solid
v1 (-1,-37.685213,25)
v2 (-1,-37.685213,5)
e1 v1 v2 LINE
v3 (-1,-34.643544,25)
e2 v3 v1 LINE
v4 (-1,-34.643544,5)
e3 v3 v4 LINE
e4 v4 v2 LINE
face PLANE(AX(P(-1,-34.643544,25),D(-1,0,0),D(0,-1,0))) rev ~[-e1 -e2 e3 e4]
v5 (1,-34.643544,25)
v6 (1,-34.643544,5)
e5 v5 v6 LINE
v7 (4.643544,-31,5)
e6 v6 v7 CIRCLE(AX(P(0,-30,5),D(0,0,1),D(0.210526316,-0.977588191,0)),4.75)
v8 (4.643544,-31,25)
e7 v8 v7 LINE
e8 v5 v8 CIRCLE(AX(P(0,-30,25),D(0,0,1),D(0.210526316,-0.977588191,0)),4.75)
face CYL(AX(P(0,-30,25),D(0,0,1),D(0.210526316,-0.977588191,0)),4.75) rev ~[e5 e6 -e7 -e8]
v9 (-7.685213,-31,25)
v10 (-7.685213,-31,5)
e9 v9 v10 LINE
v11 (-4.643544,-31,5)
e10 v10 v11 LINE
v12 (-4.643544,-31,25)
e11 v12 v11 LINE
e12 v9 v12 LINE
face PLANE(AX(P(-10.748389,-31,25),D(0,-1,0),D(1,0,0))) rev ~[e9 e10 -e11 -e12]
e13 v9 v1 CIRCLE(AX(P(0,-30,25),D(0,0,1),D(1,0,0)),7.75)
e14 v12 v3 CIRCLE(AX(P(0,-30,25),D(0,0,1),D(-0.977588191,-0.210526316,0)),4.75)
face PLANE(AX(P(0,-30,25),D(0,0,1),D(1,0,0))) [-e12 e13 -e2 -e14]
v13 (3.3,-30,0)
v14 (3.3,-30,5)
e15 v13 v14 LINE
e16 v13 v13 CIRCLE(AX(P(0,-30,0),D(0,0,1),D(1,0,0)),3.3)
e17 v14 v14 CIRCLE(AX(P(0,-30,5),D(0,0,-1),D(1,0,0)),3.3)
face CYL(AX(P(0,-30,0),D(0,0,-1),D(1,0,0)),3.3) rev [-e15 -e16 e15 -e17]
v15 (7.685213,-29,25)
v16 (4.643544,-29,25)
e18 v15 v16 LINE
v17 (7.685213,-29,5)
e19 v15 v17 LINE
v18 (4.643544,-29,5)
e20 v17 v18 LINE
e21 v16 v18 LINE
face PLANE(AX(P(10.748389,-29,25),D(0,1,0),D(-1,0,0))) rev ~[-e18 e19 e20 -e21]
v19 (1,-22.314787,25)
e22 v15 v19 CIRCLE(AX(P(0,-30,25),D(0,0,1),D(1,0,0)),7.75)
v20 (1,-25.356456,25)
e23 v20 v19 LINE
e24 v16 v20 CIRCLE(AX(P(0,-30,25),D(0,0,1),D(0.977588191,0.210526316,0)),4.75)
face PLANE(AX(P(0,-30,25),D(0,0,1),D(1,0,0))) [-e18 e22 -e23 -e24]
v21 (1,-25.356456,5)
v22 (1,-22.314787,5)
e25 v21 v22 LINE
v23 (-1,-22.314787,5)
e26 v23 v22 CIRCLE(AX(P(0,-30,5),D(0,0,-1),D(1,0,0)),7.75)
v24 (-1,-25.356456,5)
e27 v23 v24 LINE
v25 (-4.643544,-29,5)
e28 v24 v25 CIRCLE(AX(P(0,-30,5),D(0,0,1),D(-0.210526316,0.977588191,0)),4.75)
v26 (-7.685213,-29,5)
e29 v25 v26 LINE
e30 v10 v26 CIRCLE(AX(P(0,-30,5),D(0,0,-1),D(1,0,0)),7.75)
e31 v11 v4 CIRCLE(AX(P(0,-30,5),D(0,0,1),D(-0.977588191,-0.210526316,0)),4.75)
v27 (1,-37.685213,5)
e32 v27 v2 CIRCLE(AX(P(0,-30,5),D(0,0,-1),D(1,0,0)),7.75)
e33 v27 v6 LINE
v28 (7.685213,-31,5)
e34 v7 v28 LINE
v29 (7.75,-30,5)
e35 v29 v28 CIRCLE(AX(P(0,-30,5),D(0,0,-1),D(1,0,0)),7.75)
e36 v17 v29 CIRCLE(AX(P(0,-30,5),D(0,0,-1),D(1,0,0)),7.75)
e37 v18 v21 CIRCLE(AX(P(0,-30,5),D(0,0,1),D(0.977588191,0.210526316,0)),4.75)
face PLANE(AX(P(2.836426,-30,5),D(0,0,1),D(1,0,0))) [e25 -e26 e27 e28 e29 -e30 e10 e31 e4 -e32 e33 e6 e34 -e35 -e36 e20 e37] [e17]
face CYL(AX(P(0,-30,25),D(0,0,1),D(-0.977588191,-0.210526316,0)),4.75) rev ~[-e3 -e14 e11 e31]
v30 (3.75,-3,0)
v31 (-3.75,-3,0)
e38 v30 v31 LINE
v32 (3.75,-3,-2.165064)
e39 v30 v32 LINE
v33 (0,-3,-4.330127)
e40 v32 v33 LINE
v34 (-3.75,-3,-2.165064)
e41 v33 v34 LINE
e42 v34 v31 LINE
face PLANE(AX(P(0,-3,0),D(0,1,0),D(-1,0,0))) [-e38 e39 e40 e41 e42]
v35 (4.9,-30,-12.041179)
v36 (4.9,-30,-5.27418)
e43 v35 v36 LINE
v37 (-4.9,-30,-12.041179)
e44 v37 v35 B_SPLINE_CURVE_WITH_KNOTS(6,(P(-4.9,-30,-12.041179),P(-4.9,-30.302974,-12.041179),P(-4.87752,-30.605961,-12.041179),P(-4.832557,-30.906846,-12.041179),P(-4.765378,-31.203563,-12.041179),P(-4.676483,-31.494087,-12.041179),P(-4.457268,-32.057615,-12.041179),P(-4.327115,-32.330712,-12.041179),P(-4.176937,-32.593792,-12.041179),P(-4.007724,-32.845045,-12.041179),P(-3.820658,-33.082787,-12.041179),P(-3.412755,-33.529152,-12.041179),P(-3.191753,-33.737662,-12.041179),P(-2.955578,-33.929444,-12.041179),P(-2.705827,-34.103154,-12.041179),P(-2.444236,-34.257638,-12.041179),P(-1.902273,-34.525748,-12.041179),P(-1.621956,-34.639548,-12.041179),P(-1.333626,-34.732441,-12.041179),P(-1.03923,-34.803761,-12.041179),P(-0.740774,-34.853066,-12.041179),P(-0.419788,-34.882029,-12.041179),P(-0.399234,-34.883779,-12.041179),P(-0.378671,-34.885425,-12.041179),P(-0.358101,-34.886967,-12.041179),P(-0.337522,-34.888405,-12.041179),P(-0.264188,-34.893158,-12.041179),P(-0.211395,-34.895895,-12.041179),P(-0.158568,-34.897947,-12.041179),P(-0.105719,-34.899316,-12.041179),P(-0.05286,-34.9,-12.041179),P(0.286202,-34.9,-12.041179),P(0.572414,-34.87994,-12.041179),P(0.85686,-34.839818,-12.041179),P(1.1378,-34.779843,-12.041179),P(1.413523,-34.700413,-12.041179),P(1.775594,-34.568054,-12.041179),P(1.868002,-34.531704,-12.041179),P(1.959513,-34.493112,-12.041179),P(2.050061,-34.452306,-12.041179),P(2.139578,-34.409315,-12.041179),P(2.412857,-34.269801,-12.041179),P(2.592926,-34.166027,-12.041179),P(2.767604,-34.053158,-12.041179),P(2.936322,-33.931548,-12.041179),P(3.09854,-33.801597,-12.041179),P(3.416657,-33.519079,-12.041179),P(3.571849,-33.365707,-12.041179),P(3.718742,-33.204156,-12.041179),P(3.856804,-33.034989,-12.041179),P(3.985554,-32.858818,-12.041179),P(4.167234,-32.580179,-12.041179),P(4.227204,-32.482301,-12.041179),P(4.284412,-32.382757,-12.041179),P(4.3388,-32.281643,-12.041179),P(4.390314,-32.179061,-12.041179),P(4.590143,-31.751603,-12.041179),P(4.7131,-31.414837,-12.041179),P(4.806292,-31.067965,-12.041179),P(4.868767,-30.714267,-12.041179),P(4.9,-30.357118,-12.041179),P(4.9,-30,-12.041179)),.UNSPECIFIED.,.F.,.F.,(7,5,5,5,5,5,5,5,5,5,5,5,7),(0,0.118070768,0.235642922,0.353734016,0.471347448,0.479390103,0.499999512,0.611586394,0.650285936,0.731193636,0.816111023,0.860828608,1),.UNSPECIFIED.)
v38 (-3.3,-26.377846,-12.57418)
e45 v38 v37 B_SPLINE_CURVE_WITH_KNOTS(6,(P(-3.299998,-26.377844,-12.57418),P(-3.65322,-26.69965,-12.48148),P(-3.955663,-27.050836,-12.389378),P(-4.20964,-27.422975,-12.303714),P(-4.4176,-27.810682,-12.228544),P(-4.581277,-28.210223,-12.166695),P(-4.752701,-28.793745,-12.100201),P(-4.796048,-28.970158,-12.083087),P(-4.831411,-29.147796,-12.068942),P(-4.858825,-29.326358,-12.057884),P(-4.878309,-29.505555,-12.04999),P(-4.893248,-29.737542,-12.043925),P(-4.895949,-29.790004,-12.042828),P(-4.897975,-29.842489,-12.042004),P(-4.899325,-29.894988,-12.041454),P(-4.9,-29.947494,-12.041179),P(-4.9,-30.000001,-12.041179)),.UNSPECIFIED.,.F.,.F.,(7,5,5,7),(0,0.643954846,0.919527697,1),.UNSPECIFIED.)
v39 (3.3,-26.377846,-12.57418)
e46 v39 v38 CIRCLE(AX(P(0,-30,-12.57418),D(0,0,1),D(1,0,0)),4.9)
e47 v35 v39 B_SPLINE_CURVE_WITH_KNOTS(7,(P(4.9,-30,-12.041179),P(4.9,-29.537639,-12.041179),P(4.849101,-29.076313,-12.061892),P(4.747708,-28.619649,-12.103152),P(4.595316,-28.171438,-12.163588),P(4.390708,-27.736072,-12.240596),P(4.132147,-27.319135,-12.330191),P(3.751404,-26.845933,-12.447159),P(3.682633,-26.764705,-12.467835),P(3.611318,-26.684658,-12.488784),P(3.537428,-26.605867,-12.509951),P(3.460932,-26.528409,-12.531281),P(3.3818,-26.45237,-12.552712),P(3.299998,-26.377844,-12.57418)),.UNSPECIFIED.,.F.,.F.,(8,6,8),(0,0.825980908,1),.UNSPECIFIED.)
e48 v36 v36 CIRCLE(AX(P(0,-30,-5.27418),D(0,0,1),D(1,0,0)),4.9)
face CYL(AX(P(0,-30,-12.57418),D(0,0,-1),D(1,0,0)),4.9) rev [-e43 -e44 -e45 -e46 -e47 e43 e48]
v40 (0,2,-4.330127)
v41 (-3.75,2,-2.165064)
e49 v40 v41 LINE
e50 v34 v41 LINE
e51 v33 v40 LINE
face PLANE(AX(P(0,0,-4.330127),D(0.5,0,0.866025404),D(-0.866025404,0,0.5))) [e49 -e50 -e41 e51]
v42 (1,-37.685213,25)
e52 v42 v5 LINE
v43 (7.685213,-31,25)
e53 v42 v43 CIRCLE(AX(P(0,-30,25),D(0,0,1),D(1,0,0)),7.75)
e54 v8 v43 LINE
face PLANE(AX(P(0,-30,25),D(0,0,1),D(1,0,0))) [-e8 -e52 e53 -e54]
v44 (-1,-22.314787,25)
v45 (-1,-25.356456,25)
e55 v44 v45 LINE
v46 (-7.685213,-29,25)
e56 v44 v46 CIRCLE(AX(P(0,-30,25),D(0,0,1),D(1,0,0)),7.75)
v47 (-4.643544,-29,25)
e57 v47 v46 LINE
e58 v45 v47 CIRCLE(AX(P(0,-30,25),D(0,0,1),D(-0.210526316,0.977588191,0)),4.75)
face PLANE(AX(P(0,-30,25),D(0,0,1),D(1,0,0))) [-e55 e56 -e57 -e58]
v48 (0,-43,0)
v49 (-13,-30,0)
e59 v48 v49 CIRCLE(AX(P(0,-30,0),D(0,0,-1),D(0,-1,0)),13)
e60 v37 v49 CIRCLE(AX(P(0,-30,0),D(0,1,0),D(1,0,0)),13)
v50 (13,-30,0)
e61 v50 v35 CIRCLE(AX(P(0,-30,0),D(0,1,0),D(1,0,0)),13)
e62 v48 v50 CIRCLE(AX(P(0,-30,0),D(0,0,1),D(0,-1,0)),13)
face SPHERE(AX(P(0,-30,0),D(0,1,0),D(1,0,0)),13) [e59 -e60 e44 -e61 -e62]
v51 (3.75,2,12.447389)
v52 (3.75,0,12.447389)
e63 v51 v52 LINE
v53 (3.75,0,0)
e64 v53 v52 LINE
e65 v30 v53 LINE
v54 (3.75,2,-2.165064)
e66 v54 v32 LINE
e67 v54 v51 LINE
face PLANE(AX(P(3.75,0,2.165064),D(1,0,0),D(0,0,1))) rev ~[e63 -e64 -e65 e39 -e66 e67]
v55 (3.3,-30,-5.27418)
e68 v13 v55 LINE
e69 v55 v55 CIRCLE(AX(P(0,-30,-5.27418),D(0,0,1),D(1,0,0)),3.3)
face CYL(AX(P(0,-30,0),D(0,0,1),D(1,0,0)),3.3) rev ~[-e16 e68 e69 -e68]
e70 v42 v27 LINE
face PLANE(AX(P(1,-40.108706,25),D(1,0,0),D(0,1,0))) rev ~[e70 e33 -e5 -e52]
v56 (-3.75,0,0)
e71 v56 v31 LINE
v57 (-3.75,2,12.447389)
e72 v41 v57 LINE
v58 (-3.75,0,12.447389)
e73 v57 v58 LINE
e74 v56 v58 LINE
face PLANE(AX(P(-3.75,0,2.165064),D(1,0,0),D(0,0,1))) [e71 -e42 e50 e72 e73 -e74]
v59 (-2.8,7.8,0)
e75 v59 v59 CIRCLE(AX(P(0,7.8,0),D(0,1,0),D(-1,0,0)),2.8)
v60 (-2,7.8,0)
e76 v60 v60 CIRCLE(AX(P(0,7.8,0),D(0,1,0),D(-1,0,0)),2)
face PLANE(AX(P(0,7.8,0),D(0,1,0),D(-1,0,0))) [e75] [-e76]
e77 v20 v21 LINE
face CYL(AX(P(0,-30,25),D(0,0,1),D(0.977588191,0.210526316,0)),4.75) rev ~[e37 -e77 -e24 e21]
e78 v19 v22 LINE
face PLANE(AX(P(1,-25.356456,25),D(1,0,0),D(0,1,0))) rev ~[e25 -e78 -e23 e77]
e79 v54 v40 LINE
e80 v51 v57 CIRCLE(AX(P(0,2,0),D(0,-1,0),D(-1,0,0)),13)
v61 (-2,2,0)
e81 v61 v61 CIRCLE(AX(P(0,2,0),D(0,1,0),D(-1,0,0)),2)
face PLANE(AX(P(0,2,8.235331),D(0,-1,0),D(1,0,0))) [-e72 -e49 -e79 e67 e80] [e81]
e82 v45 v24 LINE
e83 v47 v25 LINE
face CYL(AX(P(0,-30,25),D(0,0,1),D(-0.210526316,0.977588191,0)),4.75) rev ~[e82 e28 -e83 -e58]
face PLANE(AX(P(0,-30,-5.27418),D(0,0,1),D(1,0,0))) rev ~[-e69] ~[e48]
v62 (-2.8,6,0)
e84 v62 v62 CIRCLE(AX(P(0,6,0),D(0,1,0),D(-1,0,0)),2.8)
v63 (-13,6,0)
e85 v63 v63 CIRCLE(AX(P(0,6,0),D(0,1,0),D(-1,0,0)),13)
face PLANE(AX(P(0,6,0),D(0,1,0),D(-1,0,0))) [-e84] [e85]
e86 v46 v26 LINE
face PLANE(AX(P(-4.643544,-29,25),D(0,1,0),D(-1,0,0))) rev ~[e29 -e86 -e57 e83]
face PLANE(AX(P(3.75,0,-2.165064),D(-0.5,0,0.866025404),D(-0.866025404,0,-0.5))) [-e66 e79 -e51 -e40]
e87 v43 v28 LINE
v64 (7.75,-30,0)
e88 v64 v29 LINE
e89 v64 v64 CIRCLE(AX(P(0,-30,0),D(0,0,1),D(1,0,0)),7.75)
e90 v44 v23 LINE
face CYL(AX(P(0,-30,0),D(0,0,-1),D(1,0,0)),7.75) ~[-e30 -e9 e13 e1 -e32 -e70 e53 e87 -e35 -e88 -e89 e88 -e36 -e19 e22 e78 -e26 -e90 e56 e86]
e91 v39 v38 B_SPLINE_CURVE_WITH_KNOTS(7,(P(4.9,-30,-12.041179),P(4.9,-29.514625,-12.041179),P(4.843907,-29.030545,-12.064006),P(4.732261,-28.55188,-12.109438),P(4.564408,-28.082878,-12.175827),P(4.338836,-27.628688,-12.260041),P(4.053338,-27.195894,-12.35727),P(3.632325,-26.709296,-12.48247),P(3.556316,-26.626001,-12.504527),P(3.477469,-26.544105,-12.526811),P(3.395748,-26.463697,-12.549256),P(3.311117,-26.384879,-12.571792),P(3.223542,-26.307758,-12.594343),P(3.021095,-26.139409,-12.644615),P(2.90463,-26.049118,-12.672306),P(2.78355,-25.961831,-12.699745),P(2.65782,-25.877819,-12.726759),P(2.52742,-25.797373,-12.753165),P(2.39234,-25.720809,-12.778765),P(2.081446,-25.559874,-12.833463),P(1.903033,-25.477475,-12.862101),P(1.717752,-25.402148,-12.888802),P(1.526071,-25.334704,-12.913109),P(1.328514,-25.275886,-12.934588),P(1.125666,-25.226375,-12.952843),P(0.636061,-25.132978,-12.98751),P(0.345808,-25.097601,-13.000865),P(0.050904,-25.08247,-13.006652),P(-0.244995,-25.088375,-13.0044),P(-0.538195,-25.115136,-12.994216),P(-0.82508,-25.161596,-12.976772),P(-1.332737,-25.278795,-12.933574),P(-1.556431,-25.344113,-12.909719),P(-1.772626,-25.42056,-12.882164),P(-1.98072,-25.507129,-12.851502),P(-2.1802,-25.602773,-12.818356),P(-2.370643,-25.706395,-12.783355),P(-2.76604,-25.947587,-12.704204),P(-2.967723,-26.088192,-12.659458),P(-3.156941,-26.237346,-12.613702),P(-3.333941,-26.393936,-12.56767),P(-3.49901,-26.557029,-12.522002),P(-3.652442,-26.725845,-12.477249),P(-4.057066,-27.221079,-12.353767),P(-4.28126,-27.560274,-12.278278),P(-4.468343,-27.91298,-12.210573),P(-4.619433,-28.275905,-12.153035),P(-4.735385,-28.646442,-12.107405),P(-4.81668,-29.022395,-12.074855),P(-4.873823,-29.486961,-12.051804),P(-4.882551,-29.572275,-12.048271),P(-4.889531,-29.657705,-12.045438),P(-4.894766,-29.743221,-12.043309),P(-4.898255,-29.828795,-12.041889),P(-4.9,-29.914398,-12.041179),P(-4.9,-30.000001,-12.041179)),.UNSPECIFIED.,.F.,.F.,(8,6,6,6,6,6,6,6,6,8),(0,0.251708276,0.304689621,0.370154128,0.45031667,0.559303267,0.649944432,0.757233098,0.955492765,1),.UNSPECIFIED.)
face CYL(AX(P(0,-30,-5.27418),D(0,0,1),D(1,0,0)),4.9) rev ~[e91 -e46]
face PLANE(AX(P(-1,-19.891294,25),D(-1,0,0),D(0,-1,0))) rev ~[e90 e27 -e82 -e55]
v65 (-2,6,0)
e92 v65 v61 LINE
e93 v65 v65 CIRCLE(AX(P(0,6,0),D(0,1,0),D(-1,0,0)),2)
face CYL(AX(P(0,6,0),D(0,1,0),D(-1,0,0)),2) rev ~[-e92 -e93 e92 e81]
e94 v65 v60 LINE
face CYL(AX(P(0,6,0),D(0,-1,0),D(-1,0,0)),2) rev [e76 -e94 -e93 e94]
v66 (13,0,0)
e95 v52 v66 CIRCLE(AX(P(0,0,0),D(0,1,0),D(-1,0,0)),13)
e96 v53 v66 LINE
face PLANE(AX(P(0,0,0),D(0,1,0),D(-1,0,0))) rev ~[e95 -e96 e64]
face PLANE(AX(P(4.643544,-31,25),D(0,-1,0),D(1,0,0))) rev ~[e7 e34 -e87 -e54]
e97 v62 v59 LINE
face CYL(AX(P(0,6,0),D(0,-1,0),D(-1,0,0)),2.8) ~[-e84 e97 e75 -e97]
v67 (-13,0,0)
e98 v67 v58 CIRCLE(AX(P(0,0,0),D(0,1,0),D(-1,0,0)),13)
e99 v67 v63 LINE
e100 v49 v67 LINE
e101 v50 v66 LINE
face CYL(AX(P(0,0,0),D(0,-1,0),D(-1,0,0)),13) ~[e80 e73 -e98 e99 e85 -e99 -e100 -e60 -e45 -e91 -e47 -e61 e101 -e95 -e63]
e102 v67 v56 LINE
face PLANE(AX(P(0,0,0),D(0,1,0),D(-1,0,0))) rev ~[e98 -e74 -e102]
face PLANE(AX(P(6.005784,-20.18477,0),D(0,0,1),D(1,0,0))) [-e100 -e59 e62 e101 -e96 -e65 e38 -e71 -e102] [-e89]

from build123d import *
from build123d import SkipClean  # not in build123d's __all__

# Parameters (mm, degrees)
F1_ANGLE  = 180
F2_R      = 13
F3_DEPTH  = 6
F4_R      = 2
F5_DEPTH  = 6
F7_DEPTH  = 2
F8_DEPTH  = 5
F9_DEPTH  = 3
F10_W     = 7.5
F10_H     = 12.1405349095
F11_DEPTH = 2
F12_R     = 2.8
F12_R_2   = 2
F13_DEPTH = 1.8
F14_R     = 3.3
F15_DEPTH = 25
F17_R     = 4.9
F18_DEPTH = 7.3
F19_DEPTH = 25
F20_R     = 7.75
F20_R_2   = 3.3
F21_DEPTH = 25
F23_DEPTH = 20


# Not quite as in the source:
# - after a boolean that leaves OpenCascade's solid faulty, fix() repairs it


with BuildPart() as f1:
    # F0 (on Top) → F1 (revolve)
    with BuildSketch(Plane.XY):
        with BuildLine():
            Line((13, 0), (0, 0))
            Line((0, 0), (0, -43))
            ThreePointArc((0, -43), (9.1923881554, -39.1923881554), (13, -30))
            Line((13, -30), (13, 0))
        make_face()
    revolve(axis=Axis((0, -21.5, 0), (0, 1, 0)), revolution_arc=F1_ANGLE)

    # F2 (on face) → F3 (join)
    with BuildSketch(Plane(origin=(0, 0, 0), x_dir=(-1, 0, 0), z_dir=(0, 1, 0))):
        Circle(F2_R)
    with SkipClean():  # cleaning this boolean's faces spoils the solid; the shape is the same uncleaned
        extrude(amount=F3_DEPTH)

    # F4 (on face) → F5 (cut)
    with BuildSketch(Plane(origin=(0, 6, 0), x_dir=(-1, 0, 0), z_dir=(0, 1, 0))):
        Circle(F4_R)
    extrude(amount=-F5_DEPTH, mode=Mode.SUBTRACT)

    add(f1.part.fix(), mode=Mode.REPLACE)

    # F6 (on face) → F7 (cut)
    with BuildSketch(Plane(origin=(0, 0, 0), x_dir=(-1, 0, 0), z_dir=(0, 1, 0))):
        Polygon((3.75, 2.1650635095), (0, 4.3301270189), (-3.75, 2.1650635095), (-3.75, -2.1650635095), (0, -4.3301270189), (3.75, -2.1650635095), align=None)
    extrude(amount=F7_DEPTH, mode=Mode.SUBTRACT)

    # F8 (cut): a face of the model
    f8_faces = [f1.faces().sort_by_distance(p)[0] for p in [
        (-3.6354356076, 2, 0),
    ]]
    extrude(f8_faces, amount=F8_DEPTH, mode=Mode.SUBTRACT)

    # F9 (cut): a face of the model
    f9_faces = [f1.faces().sort_by_distance(p)[0] for p in [
        (0, 0, -0.8488263632),
    ]]
    extrude(f9_faces, amount=-F9_DEPTH, mode=Mode.SUBTRACT)

    # F10 (on face) → F11 (cut)
    with BuildSketch(Plane.XZ):
        with Locations((0, 8.2353309642)):
            Rectangle(F10_W, F10_H)
    extrude(amount=-F11_DEPTH, mode=Mode.SUBTRACT)

    # F12 (on face) → F13 (join)
    with BuildSketch(Plane(origin=(0, 6, 0), x_dir=(-1, 0, 0), z_dir=(0, 1, 0))):
        Circle(F12_R)
        Circle(F12_R_2, mode=Mode.SUBTRACT)
    extrude(amount=F13_DEPTH)

    # F14 (on face) → F15 (cut)
    with BuildSketch(Plane.XY):
        with Locations((0, -30)):
            Circle(F14_R)
    extrude(amount=-F15_DEPTH, mode=Mode.SUBTRACT)

    # F17 (on face) → F18 (cut)
    with BuildSketch(Plane.XY.offset(-12.5741798937)):
        with Locations((0, -30)):
            Circle(F17_R)
    extrude(amount=F18_DEPTH, mode=Mode.SUBTRACT)

    # F19 (cut): a face of the model
    f19_faces = [f1.faces().sort_by_distance(p)[0] for p in [
        (-4.7614070709, -30, -5.2741798937),
    ]]
    extrude(f19_faces, amount=F19_DEPTH, mode=Mode.SUBTRACT)

    # F20 (on face) → F21 (join)
    with BuildSketch(Plane.XY):
        with Locations((0, -30)):
            Circle(F20_R)
        with Locations((0, -30)):
            Circle(F20_R_2, mode=Mode.SUBTRACT)
    extrude(amount=F21_DEPTH)

    # F22 (on face) → F23 (cut)
    with BuildSketch(Plane.XY.offset(25)):
        with BuildLine():
            ThreePointArc((4.6435439053, -31), (4.7233109971, -30.502825243), (4.75, -30))
            ThreePointArc((4.75, -30), (4.7233109971, -29.497174757), (4.6435439053, -29))
            Line((4.6435439053, -29), (1, -29))
            Line((1, -29), (1, -31))
            Line((1, -31), (4.6435439053, -31))
        make_face()
        with BuildLine():
            ThreePointArc((4.6435439053, -29), (4.7233109971, -29.497174757), (4.75, -30))
            ThreePointArc((4.75, -30), (4.7233109971, -30.502825243), (4.6435439053, -31))
            Line((4.6435439053, -31), (10.7483885819, -31))
            Line((10.7483885819, -31), (10.7483885819, -29))
            Line((10.7483885819, -29), (4.6435439053, -29))
        make_face()
        with BuildLine():
            Line((1, -29), (4.6435439053, -29))
            ThreePointArc((4.6435439053, -29), (3.3587572106, -26.6412427894), (1, -25.3564560947))
            Line((1, -25.3564560947), (1, -29))
        make_face()
        with BuildLine():
            ThreePointArc((1, -34.6435439053), (3.3587572106, -33.3587572106), (4.6435439053, -31))
            Line((4.6435439053, -31), (1, -31))
            Line((1, -31), (1, -34.6435439053))
        make_face()
        with BuildLine():
            Line((1, -29), (1, -25.3564560947))
            ThreePointArc((1, -25.3564560947), (0, -25.25), (-1, -25.3564560947))
            Line((-1, -25.3564560947), (-1, -29))
            Line((-1, -29), (1, -29))
        make_face()
        with BuildLine():
            ThreePointArc((-1, -25.3564560947), (0, -25.25), (1, -25.3564560947))
            Line((1, -25.3564560947), (1, -19.8912940045))
            Line((1, -19.8912940045), (-1, -19.8912940045))
            Line((-1, -19.8912940045), (-1, -25.3564560947))
        make_face()
        with BuildLine():
            Line((1, -40.1087059955), (1, -34.6435439053))
            ThreePointArc((1, -34.6435439053), (0, -34.75), (-1, -34.6435439053))
            Line((-1, -34.6435439053), (-1, -40.1087059955))
            Line((-1, -40.1087059955), (1, -40.1087059955))
        make_face()
        with BuildLine():
            ThreePointArc((-1, -34.6435439053), (0, -34.75), (1, -34.6435439053))
            Line((1, -34.6435439053), (1, -31))
            Line((1, -31), (-1, -31))
            Line((-1, -31), (-1, -34.6435439053))
        make_face()
        with BuildLine():
            Line((-1, -29), (-1, -25.3564560947))
            ThreePointArc((-1, -25.3564560947), (-3.3587572106, -26.6412427894), (-4.6435439053, -29))
            Line((-4.6435439053, -29), (-1, -29))
        make_face()
        with BuildLine():
            Line((-1, -31), (-1, -29))
            Line((-1, -29), (-4.6435439053, -29))
            ThreePointArc((-4.6435439053, -29), (-4.75, -30), (-4.6435439053, -31))
            Line((-4.6435439053, -31), (-1, -31))
        make_face()
        with BuildLine():
            ThreePointArc((-4.6435439053, -31), (-3.3587572106, -33.3587572106), (-1, -34.6435439053))
            Line((-1, -34.6435439053), (-1, -31))
            Line((-1, -31), (-4.6435439053, -31))
        make_face()
        with BuildLine():
            ThreePointArc((-4.6435439053, -31), (-4.75, -30), (-4.6435439053, -29))
            Line((-4.6435439053, -29), (-10.7483885819, -29))
            Line((-10.7483885819, -29), (-10.7483885819, -31))
            Line((-10.7483885819, -31), (-4.6435439053, -31))
        make_face()
    extrude(amount=-F23_DEPTH, mode=Mode.SUBTRACT)


solid = f1.part
